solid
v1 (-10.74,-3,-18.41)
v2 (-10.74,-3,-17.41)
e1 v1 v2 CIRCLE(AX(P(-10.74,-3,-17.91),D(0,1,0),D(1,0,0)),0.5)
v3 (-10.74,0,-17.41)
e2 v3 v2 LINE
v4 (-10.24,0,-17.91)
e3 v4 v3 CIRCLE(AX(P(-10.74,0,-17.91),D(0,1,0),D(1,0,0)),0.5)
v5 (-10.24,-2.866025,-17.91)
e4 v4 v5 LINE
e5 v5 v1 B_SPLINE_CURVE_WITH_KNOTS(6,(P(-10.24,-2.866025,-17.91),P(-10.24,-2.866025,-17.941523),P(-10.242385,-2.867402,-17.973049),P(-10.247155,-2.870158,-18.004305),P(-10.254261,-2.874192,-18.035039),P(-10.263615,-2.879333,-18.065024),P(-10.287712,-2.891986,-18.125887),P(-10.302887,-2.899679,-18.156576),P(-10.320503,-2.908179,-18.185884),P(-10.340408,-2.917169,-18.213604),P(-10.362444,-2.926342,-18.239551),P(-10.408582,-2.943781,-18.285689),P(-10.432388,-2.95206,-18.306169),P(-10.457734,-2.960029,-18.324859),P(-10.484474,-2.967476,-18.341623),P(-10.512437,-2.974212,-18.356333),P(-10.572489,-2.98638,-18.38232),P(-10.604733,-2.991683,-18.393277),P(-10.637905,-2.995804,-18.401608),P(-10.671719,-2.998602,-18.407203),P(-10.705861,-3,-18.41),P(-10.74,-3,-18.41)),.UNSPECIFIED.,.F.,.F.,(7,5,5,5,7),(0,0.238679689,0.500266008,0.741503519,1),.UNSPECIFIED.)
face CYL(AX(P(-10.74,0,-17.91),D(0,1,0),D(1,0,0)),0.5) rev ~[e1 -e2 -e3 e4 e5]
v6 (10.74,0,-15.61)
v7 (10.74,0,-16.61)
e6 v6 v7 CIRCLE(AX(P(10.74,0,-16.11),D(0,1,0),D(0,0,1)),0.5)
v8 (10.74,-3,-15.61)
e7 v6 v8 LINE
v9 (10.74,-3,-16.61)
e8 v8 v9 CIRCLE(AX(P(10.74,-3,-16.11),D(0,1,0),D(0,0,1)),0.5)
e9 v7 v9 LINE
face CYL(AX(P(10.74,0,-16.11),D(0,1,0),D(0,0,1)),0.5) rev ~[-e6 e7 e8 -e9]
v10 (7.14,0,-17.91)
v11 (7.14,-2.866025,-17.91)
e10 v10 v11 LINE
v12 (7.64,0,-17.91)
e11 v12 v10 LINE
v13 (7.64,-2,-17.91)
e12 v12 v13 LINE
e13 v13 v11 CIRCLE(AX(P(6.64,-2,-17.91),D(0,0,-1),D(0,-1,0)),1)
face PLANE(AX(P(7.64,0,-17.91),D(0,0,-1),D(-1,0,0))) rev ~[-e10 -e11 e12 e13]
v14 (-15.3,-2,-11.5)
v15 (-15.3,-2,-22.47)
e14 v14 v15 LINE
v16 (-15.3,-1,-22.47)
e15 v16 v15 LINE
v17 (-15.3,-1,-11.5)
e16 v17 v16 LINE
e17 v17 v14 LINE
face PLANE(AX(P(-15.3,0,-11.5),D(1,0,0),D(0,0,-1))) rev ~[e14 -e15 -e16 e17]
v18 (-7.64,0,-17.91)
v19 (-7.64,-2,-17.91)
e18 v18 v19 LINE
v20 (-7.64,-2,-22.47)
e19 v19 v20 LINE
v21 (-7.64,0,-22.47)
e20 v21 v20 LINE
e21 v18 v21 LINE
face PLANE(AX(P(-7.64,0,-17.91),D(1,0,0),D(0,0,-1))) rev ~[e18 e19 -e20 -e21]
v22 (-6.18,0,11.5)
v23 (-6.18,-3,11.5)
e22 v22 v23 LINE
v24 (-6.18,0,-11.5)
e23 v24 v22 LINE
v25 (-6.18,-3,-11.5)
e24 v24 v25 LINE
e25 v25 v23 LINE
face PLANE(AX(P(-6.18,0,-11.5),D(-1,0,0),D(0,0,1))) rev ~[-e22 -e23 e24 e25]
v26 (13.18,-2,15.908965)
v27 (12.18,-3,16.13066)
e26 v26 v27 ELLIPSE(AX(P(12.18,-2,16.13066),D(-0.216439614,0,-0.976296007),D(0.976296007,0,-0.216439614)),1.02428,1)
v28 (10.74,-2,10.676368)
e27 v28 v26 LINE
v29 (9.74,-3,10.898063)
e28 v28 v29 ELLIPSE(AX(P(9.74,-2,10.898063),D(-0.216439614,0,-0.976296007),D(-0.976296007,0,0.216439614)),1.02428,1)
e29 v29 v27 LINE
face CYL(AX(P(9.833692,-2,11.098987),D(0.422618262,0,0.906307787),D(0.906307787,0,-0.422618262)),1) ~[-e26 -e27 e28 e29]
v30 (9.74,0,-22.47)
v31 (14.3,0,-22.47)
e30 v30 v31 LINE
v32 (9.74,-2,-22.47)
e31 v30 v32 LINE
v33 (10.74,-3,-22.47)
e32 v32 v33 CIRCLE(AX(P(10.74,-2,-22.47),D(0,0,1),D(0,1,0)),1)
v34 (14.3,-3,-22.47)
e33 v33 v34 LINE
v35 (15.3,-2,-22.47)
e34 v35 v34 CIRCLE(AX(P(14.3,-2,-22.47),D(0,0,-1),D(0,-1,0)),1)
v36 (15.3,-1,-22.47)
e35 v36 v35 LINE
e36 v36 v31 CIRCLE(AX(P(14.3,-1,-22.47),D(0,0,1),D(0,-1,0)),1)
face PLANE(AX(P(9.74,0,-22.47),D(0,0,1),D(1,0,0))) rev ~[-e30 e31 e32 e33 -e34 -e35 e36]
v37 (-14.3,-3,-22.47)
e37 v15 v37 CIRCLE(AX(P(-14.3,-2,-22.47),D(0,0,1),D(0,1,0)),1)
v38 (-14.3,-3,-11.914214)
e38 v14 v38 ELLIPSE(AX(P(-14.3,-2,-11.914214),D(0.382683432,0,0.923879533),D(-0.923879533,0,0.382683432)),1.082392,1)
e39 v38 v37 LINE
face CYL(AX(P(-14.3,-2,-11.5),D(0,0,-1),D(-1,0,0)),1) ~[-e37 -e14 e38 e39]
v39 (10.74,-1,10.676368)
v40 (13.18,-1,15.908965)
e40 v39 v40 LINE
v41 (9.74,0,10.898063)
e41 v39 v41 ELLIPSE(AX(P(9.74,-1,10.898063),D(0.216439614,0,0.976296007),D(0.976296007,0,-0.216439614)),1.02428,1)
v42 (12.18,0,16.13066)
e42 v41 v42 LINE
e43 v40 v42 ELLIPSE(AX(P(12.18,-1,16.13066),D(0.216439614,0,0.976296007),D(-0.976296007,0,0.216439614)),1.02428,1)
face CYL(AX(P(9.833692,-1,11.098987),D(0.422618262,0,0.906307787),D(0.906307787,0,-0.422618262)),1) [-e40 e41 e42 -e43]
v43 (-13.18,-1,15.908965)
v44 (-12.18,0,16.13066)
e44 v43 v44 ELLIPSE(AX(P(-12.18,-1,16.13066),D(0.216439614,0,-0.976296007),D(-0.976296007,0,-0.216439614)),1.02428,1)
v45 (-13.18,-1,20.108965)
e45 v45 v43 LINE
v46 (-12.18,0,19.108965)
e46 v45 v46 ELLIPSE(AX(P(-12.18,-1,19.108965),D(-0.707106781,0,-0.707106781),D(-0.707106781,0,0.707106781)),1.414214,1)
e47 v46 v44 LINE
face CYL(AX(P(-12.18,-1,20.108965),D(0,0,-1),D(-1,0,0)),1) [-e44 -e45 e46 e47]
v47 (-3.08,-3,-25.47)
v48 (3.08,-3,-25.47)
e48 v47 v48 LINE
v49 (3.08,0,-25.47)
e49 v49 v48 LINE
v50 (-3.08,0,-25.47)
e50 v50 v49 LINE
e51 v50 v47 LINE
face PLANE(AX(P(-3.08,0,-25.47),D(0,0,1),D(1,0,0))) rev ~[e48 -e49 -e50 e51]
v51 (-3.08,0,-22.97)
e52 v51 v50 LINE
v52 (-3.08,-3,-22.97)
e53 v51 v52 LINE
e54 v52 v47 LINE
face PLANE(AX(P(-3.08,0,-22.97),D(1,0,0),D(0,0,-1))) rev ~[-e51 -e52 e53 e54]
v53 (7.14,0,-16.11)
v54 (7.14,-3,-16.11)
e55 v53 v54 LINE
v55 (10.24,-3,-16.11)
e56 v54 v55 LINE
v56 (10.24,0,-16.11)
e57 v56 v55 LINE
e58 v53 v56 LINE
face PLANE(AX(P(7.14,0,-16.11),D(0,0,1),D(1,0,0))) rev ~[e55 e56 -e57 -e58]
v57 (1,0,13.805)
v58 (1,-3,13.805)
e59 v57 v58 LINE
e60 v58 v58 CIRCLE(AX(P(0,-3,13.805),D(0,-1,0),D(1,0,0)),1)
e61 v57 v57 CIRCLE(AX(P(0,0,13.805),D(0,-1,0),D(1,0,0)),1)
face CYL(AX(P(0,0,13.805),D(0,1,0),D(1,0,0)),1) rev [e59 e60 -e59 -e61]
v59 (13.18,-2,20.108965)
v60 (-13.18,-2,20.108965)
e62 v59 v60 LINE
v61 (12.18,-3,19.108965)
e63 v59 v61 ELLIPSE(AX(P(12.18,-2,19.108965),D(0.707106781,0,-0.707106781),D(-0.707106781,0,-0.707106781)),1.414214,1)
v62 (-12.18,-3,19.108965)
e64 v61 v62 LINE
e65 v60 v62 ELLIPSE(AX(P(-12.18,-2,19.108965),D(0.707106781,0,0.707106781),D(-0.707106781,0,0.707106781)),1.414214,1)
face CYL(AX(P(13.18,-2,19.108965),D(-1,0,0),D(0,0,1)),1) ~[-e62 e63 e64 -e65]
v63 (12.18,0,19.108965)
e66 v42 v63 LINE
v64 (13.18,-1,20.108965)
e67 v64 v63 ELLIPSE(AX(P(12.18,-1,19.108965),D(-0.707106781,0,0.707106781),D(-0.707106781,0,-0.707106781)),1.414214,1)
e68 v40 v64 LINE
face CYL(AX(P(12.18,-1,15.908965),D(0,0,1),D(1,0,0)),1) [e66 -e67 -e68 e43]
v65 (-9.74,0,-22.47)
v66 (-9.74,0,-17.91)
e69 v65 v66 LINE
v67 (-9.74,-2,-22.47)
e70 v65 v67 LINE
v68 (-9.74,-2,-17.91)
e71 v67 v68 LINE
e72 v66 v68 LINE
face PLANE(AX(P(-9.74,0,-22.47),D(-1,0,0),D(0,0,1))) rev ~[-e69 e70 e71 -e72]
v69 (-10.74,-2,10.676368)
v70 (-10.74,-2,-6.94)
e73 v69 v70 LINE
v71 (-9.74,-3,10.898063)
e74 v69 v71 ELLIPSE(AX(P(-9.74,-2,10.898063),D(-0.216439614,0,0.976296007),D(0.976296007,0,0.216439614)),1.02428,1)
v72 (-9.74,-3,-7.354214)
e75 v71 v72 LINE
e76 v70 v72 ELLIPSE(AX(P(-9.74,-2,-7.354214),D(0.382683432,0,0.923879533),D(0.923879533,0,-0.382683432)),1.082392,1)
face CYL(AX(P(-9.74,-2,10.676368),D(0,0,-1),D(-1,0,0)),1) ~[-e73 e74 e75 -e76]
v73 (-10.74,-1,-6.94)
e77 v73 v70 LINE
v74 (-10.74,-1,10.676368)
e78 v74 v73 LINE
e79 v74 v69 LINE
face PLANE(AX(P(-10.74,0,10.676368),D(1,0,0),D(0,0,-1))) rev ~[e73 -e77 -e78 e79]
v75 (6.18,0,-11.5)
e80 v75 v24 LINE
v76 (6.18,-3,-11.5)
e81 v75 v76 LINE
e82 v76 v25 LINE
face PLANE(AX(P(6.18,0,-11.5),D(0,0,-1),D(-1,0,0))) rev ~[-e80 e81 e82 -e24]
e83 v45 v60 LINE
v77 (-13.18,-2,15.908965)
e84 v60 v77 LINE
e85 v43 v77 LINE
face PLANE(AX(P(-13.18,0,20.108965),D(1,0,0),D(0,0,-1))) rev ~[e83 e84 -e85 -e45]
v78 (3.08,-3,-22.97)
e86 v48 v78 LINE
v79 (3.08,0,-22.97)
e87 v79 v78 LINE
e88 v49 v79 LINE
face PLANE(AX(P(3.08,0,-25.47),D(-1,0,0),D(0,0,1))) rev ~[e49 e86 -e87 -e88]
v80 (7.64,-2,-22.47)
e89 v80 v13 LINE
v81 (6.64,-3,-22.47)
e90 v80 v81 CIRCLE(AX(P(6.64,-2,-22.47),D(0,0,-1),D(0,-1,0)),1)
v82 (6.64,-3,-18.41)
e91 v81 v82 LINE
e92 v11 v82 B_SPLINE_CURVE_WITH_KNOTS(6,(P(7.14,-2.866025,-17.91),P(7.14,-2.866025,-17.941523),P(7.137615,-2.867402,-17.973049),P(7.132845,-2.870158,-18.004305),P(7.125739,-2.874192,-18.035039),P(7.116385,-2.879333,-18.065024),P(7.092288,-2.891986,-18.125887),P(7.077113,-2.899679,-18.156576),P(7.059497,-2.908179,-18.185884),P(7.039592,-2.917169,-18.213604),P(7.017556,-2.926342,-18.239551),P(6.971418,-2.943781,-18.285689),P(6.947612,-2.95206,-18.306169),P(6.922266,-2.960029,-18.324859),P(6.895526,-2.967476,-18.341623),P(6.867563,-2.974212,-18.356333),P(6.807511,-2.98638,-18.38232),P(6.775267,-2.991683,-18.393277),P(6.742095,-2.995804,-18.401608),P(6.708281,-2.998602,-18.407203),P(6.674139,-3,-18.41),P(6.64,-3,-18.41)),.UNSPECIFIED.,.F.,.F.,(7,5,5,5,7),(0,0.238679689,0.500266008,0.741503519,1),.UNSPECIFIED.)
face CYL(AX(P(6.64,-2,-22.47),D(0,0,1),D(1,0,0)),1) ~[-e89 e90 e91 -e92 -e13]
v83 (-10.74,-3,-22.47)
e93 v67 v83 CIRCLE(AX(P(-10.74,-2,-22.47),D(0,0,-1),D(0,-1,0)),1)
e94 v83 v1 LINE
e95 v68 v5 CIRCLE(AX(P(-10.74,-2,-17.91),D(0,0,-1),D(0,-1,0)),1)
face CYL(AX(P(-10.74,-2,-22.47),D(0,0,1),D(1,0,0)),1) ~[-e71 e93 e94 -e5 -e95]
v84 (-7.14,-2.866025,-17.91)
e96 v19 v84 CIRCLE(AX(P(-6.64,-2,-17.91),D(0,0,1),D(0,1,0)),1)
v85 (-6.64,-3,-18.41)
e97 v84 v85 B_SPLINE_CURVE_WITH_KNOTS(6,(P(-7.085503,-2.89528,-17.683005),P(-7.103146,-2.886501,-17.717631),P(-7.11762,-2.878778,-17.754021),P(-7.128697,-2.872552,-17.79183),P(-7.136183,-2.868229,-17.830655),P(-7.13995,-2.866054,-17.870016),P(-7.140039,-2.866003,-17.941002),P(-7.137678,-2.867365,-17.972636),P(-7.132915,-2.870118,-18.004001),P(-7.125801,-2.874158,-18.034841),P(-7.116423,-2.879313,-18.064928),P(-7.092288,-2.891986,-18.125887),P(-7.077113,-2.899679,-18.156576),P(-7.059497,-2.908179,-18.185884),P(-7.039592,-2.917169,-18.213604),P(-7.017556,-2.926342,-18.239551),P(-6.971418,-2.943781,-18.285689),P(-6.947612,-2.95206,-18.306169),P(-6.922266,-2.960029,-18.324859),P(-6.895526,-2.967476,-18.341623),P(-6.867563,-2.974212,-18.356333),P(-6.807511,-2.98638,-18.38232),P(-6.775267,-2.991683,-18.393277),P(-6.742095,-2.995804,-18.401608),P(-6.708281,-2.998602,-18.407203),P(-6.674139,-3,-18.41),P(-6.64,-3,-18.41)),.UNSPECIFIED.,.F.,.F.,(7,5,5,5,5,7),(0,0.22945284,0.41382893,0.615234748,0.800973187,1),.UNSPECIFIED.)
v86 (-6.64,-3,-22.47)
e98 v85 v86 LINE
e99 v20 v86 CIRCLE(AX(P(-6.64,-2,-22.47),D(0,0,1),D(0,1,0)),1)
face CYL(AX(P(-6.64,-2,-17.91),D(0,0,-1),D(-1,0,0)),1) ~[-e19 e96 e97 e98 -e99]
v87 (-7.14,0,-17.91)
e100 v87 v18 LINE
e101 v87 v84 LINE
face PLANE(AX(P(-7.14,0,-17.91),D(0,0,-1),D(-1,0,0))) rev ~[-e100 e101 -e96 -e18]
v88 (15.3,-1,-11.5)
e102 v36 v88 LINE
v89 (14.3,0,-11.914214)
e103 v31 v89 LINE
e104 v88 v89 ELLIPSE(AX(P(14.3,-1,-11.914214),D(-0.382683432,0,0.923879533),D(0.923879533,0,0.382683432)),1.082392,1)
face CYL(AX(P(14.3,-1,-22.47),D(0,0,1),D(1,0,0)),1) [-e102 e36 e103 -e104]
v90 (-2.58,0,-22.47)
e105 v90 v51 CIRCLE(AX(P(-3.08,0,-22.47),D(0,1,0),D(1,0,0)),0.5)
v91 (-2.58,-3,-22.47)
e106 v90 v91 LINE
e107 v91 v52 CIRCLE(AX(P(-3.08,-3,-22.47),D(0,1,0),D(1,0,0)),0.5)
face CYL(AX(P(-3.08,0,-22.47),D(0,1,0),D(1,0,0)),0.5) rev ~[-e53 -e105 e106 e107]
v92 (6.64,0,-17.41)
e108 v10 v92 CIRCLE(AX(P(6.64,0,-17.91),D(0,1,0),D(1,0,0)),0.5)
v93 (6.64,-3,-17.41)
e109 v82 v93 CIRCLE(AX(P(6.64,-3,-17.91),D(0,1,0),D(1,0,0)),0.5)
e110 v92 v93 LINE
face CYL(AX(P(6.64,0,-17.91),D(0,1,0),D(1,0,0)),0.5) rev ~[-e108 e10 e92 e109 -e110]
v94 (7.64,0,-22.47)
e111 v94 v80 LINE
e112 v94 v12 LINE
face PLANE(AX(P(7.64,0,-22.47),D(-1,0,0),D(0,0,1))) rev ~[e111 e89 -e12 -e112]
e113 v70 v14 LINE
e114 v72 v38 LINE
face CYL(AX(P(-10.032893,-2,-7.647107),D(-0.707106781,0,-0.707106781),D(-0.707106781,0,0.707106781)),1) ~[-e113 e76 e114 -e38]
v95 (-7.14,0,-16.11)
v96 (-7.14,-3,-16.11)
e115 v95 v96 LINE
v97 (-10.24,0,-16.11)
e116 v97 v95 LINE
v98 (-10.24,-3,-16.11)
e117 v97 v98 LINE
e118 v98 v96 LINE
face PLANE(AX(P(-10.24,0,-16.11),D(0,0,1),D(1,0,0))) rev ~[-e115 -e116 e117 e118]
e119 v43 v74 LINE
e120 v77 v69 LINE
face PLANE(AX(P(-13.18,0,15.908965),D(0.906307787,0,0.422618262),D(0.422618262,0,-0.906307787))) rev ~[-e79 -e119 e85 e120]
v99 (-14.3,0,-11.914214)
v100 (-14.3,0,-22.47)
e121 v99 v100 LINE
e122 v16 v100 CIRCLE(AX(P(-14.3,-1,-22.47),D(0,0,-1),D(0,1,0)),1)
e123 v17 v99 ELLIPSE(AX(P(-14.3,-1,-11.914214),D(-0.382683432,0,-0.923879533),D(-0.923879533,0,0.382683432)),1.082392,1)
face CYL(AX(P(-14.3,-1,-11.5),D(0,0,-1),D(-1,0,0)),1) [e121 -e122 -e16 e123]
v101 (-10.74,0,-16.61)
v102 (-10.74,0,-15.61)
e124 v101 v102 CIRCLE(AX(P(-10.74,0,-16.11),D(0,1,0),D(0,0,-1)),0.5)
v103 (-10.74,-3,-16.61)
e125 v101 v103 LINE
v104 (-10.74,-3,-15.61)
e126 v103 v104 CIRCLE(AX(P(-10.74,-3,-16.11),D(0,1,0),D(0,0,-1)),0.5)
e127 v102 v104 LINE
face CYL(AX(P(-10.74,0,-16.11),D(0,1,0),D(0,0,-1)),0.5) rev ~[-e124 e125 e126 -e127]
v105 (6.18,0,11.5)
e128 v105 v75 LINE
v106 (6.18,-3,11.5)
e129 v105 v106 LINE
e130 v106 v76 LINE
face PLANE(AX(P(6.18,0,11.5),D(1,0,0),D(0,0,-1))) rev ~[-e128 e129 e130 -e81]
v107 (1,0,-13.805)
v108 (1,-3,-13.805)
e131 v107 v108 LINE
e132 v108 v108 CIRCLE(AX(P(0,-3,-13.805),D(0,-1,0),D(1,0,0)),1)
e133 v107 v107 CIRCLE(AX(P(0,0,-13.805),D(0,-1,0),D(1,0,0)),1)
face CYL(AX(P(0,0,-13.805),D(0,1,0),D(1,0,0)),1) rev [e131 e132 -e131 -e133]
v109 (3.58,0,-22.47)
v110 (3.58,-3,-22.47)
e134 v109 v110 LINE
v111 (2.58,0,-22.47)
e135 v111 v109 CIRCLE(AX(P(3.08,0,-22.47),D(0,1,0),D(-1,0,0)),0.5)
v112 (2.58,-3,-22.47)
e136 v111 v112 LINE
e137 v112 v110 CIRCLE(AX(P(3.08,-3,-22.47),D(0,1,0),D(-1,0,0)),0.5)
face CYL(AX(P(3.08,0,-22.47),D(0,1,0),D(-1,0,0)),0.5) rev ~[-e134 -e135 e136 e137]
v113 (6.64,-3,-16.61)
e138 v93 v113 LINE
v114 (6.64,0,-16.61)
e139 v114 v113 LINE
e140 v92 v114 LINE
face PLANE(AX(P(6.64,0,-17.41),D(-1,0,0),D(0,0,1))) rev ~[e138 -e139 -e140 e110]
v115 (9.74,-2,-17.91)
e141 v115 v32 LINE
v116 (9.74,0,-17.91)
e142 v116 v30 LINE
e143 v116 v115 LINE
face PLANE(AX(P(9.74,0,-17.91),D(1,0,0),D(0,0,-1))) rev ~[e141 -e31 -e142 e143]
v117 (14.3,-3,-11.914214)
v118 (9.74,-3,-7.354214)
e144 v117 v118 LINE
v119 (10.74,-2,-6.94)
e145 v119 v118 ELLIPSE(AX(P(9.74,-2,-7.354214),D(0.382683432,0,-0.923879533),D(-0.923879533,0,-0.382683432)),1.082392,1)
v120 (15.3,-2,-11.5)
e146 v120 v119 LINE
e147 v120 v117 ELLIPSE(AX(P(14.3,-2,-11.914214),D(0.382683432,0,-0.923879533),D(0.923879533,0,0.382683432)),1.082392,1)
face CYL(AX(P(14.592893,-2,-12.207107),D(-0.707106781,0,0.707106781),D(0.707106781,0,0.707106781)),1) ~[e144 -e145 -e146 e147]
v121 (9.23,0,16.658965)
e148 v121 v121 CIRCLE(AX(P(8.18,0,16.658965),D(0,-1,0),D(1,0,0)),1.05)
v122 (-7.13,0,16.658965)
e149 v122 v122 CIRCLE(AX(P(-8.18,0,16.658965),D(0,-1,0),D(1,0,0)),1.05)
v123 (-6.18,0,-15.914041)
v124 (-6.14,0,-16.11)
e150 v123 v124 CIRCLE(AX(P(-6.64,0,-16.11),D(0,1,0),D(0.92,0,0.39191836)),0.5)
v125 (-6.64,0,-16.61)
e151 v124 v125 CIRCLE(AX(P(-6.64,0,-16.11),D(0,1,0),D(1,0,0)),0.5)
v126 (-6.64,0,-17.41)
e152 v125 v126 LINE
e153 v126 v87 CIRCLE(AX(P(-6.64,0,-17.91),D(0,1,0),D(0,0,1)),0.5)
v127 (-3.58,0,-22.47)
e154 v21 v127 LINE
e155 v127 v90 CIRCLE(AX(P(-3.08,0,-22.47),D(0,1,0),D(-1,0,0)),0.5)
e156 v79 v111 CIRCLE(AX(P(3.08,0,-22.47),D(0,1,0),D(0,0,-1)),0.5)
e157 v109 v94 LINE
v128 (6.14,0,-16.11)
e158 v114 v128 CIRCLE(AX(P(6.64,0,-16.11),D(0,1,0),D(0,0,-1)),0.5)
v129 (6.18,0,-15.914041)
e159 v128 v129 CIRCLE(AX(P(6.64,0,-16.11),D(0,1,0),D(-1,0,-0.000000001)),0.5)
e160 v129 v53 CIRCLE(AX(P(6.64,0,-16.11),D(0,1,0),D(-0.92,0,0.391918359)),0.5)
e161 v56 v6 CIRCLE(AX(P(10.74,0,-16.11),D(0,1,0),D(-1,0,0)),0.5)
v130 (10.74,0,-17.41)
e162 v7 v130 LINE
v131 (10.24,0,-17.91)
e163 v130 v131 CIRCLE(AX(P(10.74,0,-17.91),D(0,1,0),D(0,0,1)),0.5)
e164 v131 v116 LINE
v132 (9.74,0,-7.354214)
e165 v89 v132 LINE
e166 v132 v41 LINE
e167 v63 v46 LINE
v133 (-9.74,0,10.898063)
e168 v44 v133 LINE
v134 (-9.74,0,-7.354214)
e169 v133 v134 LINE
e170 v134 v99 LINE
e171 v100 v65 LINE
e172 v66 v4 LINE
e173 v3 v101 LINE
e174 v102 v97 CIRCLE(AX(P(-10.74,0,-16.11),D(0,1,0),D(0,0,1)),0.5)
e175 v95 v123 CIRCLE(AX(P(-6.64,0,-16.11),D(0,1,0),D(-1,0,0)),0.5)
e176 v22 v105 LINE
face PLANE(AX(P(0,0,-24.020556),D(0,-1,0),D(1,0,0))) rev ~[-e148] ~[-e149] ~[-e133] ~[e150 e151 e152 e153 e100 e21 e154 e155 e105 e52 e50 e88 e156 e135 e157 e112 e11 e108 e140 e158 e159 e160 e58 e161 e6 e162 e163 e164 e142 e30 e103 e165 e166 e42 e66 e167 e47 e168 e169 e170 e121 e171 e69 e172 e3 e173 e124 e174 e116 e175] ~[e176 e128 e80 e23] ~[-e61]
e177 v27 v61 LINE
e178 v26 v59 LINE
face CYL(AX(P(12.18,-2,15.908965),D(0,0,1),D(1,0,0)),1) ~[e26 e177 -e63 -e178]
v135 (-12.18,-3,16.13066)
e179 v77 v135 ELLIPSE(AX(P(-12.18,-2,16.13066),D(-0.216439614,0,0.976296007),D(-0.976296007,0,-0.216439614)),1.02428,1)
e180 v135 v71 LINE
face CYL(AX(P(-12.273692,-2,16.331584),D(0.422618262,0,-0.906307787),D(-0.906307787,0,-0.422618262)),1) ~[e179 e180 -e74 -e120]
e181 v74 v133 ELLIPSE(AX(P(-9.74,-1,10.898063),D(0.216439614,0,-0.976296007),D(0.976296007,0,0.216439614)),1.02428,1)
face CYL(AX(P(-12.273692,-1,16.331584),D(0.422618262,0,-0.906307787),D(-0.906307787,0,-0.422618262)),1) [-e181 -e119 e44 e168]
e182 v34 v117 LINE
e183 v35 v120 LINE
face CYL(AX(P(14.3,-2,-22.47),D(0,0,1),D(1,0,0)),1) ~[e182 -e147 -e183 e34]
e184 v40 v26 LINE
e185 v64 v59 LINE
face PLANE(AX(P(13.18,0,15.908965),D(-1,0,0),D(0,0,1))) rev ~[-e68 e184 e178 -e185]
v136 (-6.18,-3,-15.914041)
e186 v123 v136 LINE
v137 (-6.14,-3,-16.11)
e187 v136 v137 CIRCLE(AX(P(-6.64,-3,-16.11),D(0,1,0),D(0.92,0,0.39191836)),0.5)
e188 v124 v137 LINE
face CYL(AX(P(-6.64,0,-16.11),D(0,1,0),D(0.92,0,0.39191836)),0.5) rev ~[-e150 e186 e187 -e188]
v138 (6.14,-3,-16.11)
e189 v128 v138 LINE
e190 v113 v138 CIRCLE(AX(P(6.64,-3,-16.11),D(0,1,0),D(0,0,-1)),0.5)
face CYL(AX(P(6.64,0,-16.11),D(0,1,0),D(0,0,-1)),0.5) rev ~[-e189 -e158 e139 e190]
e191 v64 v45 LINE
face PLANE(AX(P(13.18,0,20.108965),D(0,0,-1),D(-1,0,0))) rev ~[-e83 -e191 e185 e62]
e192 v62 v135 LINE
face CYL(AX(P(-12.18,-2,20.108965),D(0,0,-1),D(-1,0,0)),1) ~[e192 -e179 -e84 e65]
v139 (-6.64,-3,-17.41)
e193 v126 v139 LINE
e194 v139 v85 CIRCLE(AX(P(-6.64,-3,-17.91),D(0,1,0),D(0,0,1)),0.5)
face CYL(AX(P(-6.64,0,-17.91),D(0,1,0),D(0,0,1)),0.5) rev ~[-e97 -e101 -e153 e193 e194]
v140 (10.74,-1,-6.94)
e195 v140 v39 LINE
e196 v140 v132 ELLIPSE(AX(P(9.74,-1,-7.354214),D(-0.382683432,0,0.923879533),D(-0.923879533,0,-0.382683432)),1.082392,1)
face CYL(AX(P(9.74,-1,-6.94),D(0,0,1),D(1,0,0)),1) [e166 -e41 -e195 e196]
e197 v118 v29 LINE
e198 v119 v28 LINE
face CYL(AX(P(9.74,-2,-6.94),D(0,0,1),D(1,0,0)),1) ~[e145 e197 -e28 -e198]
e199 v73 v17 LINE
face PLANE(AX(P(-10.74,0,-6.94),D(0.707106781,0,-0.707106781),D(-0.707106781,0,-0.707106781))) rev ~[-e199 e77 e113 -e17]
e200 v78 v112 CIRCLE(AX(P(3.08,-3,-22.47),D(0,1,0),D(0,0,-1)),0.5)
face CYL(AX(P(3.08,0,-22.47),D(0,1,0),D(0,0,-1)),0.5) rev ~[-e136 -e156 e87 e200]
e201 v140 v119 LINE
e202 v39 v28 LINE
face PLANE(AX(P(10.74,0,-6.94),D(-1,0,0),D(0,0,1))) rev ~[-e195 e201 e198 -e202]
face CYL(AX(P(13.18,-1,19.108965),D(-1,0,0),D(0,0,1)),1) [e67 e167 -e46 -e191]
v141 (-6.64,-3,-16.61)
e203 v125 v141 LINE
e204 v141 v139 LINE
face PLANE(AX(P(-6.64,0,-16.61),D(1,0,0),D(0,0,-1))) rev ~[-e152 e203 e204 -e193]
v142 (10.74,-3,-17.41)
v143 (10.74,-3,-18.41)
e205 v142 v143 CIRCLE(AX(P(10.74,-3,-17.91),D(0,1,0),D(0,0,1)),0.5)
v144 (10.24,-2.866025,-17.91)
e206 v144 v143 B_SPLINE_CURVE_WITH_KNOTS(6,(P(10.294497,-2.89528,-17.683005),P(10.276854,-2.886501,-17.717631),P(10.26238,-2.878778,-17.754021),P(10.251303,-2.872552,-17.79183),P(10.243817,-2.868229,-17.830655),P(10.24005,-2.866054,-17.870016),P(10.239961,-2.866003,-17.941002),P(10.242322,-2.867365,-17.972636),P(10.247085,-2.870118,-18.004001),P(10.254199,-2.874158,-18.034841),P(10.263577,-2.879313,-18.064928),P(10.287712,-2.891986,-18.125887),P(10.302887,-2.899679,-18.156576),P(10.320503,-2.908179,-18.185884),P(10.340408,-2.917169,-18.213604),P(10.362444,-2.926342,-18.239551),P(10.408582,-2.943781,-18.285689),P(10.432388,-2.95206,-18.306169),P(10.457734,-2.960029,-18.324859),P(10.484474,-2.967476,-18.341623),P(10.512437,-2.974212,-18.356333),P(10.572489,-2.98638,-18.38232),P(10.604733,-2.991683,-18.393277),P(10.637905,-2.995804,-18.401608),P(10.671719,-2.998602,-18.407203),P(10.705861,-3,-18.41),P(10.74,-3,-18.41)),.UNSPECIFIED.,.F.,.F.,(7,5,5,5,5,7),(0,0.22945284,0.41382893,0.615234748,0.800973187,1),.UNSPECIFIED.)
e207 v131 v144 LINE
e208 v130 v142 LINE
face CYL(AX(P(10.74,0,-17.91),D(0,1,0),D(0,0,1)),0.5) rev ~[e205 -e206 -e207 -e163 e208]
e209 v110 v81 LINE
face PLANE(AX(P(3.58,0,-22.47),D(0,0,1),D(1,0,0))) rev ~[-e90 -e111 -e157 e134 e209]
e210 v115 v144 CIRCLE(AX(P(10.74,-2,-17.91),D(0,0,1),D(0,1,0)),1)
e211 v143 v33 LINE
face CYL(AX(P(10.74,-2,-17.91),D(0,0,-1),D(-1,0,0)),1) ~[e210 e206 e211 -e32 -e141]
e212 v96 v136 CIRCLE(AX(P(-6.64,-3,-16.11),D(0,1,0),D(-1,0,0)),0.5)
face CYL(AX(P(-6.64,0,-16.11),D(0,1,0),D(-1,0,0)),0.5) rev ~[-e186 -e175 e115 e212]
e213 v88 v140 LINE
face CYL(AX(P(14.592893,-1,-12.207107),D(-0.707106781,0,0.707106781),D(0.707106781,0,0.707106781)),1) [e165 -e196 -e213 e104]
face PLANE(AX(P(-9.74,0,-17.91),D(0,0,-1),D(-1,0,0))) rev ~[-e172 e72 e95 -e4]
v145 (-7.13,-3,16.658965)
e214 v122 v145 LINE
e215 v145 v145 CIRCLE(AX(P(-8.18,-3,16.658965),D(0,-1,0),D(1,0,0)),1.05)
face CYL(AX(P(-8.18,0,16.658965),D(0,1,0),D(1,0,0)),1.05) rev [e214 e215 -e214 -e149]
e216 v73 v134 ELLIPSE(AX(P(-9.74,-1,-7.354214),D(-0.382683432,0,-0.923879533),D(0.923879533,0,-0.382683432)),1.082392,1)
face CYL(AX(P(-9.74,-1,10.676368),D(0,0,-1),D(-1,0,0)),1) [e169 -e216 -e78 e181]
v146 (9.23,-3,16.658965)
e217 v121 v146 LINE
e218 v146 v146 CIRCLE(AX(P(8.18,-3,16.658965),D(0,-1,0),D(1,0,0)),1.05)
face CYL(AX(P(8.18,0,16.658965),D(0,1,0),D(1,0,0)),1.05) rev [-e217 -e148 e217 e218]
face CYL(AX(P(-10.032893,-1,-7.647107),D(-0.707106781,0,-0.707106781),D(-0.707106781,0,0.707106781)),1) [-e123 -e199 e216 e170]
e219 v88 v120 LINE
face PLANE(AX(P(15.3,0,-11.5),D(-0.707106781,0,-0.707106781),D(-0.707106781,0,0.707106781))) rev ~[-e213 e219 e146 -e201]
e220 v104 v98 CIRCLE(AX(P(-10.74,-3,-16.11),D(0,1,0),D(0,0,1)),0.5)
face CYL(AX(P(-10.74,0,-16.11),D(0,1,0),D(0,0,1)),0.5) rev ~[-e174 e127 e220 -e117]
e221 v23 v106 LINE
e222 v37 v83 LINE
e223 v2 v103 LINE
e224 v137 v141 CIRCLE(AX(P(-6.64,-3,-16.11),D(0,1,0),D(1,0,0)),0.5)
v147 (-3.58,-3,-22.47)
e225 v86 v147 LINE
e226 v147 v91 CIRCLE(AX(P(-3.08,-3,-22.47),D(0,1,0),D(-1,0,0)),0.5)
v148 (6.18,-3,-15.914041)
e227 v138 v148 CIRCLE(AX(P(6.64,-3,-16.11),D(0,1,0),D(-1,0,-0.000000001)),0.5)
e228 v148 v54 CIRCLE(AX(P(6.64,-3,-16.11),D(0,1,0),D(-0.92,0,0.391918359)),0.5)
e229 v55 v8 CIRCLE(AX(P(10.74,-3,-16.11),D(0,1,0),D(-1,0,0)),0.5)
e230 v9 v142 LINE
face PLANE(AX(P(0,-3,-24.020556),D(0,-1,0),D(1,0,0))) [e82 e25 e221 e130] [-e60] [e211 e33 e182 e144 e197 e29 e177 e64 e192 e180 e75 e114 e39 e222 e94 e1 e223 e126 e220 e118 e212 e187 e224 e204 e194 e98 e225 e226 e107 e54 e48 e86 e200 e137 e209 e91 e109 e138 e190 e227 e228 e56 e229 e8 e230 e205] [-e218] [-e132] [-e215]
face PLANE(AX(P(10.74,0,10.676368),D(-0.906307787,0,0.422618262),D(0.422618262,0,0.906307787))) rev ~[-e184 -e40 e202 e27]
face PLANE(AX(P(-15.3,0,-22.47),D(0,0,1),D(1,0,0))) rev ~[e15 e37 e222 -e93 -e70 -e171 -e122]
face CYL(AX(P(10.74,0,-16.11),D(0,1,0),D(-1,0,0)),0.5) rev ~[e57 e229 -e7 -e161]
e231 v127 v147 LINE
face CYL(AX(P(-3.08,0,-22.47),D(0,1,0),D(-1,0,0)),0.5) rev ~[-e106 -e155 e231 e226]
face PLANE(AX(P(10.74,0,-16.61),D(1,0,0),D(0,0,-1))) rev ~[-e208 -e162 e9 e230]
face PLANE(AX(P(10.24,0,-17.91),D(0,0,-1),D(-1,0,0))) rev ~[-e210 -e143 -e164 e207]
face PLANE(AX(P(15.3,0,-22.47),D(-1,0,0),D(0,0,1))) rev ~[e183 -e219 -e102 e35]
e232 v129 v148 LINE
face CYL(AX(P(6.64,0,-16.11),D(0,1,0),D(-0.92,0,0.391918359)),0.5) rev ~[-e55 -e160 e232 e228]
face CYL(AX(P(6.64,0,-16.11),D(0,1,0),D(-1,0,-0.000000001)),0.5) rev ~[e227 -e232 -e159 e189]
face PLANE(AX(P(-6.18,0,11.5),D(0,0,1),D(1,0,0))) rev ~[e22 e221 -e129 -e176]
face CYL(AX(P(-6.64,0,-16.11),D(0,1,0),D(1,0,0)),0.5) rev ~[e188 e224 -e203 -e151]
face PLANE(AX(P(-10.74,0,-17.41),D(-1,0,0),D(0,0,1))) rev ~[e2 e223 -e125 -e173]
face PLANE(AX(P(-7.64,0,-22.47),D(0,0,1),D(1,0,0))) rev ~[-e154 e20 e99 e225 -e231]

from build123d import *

# Parameters (mm, degrees)
F0_R     = 1.05
F0_R_2   = 1
F1_DEPTH = 3
F2_R     = 1


# Not quite as in the source:
# - a feature names something its author has since deleted; it is built from what else it names


with BuildPart() as f1:
    # F0 (on Front) → F1 (new body)
    with BuildSketch(Plane.XZ):
        with BuildLine():
            ThreePointArc((3.08, -22.97), (2.7264466094, -22.8235533906), (2.58, -22.47))
            Line((2.58, -22.47), (-2.58, -22.47))
            ThreePointArc((-2.58, -22.47), (-2.7264466094, -22.8235533906), (-3.08, -22.97))
            Line((-3.08, -22.97), (-3.08, -25.47))
            Line((-3.08, -25.47), (3.08, -25.47))
            Line((3.08, -25.47), (3.08, -22.97))
        make_face()
        Polygon((10.74, -6.94), (10.74, -11.5), (15.3, -11.5), align=None)
        Polygon((-15.3, -11.5), (-10.74, -11.5), (-10.74, -6.94), align=None)
        with BuildLine():
            Line((10.74, -11.5), (10.74, -15.61))
            ThreePointArc((10.74, -15.61), (11.24, -16.11), (10.74, -16.61))
            Line((10.74, -16.61), (10.74, -17.41))
            ThreePointArc((10.74, -17.41), (11.0935533906, -18.2635533906), (10.24, -17.91))
            Line((10.24, -17.91), (9.74, -17.91))
            Line((9.74, -17.91), (9.74, -22.47))
            Line((9.74, -22.47), (15.3, -22.47))
            Line((15.3, -22.47), (15.3, -11.5))
            Line((15.3, -11.5), (10.74, -11.5))
        make_face()
        with BuildLine():
            Line((-10.74, -15.61), (-10.74, -11.5))
            Line((-10.74, -11.5), (-15.3, -11.5))
            Line((-15.3, -11.5), (-15.3, -22.47))
            Line((-15.3, -22.47), (-9.74, -22.47))
            Line((-9.74, -22.47), (-9.74, -17.91))
            Line((-9.74, -17.91), (-10.24, -17.91))
            ThreePointArc((-10.24, -17.91), (-11.0935533906, -18.2635533906), (-10.74, -17.41))
            Line((-10.74, -17.41), (-10.74, -16.61))
            ThreePointArc((-10.74, -16.61), (-11.24, -16.11), (-10.74, -15.61))
        make_face()
        Polygon((6.18, -11.5), (10.74, -11.5), (10.74, -6.94), (10.74, 10.6763684678), (13.18, 15.9089653538), (13.18, 20.1089653538), (-13.18, 20.1089653538), (-13.18, 15.9089653538), (-10.74, 10.6763684678), (-10.74, -6.94), (-10.74, -11.5), (-6.18, -11.5), (-6.18, 11.5), (6.18, 11.5), align=None)
        with Locations((-8.18, 16.6589653538)):
            Circle(F0_R, mode=Mode.SUBTRACT)
        with Locations((0, 13.805)):
            Circle(F0_R_2, mode=Mode.SUBTRACT)
        with Locations((8.18, 16.6589653538)):
            Circle(F0_R, mode=Mode.SUBTRACT)
        with BuildLine():
            ThreePointArc((6.64, -16.61), (6.2864466094, -16.4635533906), (6.14, -16.11))
            Line((6.14, -16.11), (-6.14, -16.11))
            ThreePointArc((-6.14, -16.11), (-6.2864466094, -16.4635533906), (-6.64, -16.61))
            Line((-6.64, -16.61), (-6.64, -17.41))
            ThreePointArc((-6.64, -17.41), (-6.2864466094, -18.2635533906), (-7.14, -17.91))
            Line((-7.14, -17.91), (-7.64, -17.91))
            Line((-7.64, -17.91), (-7.64, -22.47))
            Line((-7.64, -22.47), (-3.58, -22.47))
            ThreePointArc((-3.58, -22.47), (-3.08, -21.97), (-2.58, -22.47))
            Line((-2.58, -22.47), (2.58, -22.47))
            ThreePointArc((2.58, -22.47), (3.08, -21.97), (3.58, -22.47))
            Line((3.58, -22.47), (7.64, -22.47))
            Line((7.64, -22.47), (7.64, -17.91))
            Line((7.64, -17.91), (7.14, -17.91))
            ThreePointArc((7.14, -17.91), (6.2864466094, -18.2635533906), (6.64, -17.41))
            Line((6.64, -17.41), (6.64, -16.61))
        make_face()
        with BuildLine():
            ThreePointArc((6.14, -16.11), (6.1501020514, -16.01), (6.18, -15.9140408206))
            Line((6.18, -15.9140408206), (6.18, -11.5))
            Line((6.18, -11.5), (-6.18, -11.5))
            Line((-6.18, -11.5), (-6.18, -15.9140408206))
            ThreePointArc((-6.18, -15.9140408206), (-6.1501020514, -16.01), (-6.14, -16.11))
            Line((-6.14, -16.11), (6.14, -16.11))
        make_face()
        with Locations((0, -13.805)):
            Circle(F0_R_2, mode=Mode.SUBTRACT)
        with BuildLine():
            Line((-6.18, -15.9140408206), (-6.18, -11.5))
            Line((-6.18, -11.5), (-10.74, -11.5))
            Line((-10.74, -11.5), (-10.74, -15.61))
            ThreePointArc((-10.74, -15.61), (-10.3864466094, -15.7564466094), (-10.24, -16.11))
            Line((-10.24, -16.11), (-7.14, -16.11))
            ThreePointArc((-7.14, -16.11), (-6.74, -15.6201020514), (-6.18, -15.9140408206))
        make_face()
        with BuildLine():
            Line((7.14, -16.11), (10.24, -16.11))
            ThreePointArc((10.24, -16.11), (10.3864466094, -15.7564466094), (10.74, -15.61))
            Line((10.74, -15.61), (10.74, -11.5))
            Line((10.74, -11.5), (6.18, -11.5))
            Line((6.18, -11.5), (6.18, -15.9140408206))
            ThreePointArc((6.18, -15.9140408206), (6.74, -15.6201020514), (7.14, -16.11))
        make_face()
    extrude(amount=F1_DEPTH)

    # F2
    f2_edges = [f1.edges().sort_by_distance(p)[0] for p in [
        (0, -3, 20.108965),
        (-13.18, -3, 18.008965),
        (-11.96, -3, 13.292667),
        (-10.74, -3, 1.868184),
        (-13.02, -3, -9.22),
        (-15.3, -3, -16.985),
        (15.3, -3, -16.985),
        (13.02, -3, -9.22),
        (10.74, -3, 1.868184),
        (11.96, -3, 13.292667),
        (13.18, -3, 18.008965),
        (7.64, -3, -20.19),
        (9.74, -3, -20.19),
        (-7.64, -3, -20.19),
        (-9.74, -3, -20.19),
        (0, 0, 20.108965),
        (13.18, 0, 18.008965),
        (11.96, 0, 13.292667),
        (-13.18, 0, 18.008965),
        (-11.96, 0, 13.292667),
        (-10.74, 0, 1.868184),
        (-13.02, 0, -9.22),
        (-15.3, 0, -16.985),
        (15.3, 0, -16.985),
        (13.02, 0, -9.22),
        (10.74, 0, 1.868184),
    ]]
    fillet(f2_edges, radius=F2_R)


solid = f1.part
